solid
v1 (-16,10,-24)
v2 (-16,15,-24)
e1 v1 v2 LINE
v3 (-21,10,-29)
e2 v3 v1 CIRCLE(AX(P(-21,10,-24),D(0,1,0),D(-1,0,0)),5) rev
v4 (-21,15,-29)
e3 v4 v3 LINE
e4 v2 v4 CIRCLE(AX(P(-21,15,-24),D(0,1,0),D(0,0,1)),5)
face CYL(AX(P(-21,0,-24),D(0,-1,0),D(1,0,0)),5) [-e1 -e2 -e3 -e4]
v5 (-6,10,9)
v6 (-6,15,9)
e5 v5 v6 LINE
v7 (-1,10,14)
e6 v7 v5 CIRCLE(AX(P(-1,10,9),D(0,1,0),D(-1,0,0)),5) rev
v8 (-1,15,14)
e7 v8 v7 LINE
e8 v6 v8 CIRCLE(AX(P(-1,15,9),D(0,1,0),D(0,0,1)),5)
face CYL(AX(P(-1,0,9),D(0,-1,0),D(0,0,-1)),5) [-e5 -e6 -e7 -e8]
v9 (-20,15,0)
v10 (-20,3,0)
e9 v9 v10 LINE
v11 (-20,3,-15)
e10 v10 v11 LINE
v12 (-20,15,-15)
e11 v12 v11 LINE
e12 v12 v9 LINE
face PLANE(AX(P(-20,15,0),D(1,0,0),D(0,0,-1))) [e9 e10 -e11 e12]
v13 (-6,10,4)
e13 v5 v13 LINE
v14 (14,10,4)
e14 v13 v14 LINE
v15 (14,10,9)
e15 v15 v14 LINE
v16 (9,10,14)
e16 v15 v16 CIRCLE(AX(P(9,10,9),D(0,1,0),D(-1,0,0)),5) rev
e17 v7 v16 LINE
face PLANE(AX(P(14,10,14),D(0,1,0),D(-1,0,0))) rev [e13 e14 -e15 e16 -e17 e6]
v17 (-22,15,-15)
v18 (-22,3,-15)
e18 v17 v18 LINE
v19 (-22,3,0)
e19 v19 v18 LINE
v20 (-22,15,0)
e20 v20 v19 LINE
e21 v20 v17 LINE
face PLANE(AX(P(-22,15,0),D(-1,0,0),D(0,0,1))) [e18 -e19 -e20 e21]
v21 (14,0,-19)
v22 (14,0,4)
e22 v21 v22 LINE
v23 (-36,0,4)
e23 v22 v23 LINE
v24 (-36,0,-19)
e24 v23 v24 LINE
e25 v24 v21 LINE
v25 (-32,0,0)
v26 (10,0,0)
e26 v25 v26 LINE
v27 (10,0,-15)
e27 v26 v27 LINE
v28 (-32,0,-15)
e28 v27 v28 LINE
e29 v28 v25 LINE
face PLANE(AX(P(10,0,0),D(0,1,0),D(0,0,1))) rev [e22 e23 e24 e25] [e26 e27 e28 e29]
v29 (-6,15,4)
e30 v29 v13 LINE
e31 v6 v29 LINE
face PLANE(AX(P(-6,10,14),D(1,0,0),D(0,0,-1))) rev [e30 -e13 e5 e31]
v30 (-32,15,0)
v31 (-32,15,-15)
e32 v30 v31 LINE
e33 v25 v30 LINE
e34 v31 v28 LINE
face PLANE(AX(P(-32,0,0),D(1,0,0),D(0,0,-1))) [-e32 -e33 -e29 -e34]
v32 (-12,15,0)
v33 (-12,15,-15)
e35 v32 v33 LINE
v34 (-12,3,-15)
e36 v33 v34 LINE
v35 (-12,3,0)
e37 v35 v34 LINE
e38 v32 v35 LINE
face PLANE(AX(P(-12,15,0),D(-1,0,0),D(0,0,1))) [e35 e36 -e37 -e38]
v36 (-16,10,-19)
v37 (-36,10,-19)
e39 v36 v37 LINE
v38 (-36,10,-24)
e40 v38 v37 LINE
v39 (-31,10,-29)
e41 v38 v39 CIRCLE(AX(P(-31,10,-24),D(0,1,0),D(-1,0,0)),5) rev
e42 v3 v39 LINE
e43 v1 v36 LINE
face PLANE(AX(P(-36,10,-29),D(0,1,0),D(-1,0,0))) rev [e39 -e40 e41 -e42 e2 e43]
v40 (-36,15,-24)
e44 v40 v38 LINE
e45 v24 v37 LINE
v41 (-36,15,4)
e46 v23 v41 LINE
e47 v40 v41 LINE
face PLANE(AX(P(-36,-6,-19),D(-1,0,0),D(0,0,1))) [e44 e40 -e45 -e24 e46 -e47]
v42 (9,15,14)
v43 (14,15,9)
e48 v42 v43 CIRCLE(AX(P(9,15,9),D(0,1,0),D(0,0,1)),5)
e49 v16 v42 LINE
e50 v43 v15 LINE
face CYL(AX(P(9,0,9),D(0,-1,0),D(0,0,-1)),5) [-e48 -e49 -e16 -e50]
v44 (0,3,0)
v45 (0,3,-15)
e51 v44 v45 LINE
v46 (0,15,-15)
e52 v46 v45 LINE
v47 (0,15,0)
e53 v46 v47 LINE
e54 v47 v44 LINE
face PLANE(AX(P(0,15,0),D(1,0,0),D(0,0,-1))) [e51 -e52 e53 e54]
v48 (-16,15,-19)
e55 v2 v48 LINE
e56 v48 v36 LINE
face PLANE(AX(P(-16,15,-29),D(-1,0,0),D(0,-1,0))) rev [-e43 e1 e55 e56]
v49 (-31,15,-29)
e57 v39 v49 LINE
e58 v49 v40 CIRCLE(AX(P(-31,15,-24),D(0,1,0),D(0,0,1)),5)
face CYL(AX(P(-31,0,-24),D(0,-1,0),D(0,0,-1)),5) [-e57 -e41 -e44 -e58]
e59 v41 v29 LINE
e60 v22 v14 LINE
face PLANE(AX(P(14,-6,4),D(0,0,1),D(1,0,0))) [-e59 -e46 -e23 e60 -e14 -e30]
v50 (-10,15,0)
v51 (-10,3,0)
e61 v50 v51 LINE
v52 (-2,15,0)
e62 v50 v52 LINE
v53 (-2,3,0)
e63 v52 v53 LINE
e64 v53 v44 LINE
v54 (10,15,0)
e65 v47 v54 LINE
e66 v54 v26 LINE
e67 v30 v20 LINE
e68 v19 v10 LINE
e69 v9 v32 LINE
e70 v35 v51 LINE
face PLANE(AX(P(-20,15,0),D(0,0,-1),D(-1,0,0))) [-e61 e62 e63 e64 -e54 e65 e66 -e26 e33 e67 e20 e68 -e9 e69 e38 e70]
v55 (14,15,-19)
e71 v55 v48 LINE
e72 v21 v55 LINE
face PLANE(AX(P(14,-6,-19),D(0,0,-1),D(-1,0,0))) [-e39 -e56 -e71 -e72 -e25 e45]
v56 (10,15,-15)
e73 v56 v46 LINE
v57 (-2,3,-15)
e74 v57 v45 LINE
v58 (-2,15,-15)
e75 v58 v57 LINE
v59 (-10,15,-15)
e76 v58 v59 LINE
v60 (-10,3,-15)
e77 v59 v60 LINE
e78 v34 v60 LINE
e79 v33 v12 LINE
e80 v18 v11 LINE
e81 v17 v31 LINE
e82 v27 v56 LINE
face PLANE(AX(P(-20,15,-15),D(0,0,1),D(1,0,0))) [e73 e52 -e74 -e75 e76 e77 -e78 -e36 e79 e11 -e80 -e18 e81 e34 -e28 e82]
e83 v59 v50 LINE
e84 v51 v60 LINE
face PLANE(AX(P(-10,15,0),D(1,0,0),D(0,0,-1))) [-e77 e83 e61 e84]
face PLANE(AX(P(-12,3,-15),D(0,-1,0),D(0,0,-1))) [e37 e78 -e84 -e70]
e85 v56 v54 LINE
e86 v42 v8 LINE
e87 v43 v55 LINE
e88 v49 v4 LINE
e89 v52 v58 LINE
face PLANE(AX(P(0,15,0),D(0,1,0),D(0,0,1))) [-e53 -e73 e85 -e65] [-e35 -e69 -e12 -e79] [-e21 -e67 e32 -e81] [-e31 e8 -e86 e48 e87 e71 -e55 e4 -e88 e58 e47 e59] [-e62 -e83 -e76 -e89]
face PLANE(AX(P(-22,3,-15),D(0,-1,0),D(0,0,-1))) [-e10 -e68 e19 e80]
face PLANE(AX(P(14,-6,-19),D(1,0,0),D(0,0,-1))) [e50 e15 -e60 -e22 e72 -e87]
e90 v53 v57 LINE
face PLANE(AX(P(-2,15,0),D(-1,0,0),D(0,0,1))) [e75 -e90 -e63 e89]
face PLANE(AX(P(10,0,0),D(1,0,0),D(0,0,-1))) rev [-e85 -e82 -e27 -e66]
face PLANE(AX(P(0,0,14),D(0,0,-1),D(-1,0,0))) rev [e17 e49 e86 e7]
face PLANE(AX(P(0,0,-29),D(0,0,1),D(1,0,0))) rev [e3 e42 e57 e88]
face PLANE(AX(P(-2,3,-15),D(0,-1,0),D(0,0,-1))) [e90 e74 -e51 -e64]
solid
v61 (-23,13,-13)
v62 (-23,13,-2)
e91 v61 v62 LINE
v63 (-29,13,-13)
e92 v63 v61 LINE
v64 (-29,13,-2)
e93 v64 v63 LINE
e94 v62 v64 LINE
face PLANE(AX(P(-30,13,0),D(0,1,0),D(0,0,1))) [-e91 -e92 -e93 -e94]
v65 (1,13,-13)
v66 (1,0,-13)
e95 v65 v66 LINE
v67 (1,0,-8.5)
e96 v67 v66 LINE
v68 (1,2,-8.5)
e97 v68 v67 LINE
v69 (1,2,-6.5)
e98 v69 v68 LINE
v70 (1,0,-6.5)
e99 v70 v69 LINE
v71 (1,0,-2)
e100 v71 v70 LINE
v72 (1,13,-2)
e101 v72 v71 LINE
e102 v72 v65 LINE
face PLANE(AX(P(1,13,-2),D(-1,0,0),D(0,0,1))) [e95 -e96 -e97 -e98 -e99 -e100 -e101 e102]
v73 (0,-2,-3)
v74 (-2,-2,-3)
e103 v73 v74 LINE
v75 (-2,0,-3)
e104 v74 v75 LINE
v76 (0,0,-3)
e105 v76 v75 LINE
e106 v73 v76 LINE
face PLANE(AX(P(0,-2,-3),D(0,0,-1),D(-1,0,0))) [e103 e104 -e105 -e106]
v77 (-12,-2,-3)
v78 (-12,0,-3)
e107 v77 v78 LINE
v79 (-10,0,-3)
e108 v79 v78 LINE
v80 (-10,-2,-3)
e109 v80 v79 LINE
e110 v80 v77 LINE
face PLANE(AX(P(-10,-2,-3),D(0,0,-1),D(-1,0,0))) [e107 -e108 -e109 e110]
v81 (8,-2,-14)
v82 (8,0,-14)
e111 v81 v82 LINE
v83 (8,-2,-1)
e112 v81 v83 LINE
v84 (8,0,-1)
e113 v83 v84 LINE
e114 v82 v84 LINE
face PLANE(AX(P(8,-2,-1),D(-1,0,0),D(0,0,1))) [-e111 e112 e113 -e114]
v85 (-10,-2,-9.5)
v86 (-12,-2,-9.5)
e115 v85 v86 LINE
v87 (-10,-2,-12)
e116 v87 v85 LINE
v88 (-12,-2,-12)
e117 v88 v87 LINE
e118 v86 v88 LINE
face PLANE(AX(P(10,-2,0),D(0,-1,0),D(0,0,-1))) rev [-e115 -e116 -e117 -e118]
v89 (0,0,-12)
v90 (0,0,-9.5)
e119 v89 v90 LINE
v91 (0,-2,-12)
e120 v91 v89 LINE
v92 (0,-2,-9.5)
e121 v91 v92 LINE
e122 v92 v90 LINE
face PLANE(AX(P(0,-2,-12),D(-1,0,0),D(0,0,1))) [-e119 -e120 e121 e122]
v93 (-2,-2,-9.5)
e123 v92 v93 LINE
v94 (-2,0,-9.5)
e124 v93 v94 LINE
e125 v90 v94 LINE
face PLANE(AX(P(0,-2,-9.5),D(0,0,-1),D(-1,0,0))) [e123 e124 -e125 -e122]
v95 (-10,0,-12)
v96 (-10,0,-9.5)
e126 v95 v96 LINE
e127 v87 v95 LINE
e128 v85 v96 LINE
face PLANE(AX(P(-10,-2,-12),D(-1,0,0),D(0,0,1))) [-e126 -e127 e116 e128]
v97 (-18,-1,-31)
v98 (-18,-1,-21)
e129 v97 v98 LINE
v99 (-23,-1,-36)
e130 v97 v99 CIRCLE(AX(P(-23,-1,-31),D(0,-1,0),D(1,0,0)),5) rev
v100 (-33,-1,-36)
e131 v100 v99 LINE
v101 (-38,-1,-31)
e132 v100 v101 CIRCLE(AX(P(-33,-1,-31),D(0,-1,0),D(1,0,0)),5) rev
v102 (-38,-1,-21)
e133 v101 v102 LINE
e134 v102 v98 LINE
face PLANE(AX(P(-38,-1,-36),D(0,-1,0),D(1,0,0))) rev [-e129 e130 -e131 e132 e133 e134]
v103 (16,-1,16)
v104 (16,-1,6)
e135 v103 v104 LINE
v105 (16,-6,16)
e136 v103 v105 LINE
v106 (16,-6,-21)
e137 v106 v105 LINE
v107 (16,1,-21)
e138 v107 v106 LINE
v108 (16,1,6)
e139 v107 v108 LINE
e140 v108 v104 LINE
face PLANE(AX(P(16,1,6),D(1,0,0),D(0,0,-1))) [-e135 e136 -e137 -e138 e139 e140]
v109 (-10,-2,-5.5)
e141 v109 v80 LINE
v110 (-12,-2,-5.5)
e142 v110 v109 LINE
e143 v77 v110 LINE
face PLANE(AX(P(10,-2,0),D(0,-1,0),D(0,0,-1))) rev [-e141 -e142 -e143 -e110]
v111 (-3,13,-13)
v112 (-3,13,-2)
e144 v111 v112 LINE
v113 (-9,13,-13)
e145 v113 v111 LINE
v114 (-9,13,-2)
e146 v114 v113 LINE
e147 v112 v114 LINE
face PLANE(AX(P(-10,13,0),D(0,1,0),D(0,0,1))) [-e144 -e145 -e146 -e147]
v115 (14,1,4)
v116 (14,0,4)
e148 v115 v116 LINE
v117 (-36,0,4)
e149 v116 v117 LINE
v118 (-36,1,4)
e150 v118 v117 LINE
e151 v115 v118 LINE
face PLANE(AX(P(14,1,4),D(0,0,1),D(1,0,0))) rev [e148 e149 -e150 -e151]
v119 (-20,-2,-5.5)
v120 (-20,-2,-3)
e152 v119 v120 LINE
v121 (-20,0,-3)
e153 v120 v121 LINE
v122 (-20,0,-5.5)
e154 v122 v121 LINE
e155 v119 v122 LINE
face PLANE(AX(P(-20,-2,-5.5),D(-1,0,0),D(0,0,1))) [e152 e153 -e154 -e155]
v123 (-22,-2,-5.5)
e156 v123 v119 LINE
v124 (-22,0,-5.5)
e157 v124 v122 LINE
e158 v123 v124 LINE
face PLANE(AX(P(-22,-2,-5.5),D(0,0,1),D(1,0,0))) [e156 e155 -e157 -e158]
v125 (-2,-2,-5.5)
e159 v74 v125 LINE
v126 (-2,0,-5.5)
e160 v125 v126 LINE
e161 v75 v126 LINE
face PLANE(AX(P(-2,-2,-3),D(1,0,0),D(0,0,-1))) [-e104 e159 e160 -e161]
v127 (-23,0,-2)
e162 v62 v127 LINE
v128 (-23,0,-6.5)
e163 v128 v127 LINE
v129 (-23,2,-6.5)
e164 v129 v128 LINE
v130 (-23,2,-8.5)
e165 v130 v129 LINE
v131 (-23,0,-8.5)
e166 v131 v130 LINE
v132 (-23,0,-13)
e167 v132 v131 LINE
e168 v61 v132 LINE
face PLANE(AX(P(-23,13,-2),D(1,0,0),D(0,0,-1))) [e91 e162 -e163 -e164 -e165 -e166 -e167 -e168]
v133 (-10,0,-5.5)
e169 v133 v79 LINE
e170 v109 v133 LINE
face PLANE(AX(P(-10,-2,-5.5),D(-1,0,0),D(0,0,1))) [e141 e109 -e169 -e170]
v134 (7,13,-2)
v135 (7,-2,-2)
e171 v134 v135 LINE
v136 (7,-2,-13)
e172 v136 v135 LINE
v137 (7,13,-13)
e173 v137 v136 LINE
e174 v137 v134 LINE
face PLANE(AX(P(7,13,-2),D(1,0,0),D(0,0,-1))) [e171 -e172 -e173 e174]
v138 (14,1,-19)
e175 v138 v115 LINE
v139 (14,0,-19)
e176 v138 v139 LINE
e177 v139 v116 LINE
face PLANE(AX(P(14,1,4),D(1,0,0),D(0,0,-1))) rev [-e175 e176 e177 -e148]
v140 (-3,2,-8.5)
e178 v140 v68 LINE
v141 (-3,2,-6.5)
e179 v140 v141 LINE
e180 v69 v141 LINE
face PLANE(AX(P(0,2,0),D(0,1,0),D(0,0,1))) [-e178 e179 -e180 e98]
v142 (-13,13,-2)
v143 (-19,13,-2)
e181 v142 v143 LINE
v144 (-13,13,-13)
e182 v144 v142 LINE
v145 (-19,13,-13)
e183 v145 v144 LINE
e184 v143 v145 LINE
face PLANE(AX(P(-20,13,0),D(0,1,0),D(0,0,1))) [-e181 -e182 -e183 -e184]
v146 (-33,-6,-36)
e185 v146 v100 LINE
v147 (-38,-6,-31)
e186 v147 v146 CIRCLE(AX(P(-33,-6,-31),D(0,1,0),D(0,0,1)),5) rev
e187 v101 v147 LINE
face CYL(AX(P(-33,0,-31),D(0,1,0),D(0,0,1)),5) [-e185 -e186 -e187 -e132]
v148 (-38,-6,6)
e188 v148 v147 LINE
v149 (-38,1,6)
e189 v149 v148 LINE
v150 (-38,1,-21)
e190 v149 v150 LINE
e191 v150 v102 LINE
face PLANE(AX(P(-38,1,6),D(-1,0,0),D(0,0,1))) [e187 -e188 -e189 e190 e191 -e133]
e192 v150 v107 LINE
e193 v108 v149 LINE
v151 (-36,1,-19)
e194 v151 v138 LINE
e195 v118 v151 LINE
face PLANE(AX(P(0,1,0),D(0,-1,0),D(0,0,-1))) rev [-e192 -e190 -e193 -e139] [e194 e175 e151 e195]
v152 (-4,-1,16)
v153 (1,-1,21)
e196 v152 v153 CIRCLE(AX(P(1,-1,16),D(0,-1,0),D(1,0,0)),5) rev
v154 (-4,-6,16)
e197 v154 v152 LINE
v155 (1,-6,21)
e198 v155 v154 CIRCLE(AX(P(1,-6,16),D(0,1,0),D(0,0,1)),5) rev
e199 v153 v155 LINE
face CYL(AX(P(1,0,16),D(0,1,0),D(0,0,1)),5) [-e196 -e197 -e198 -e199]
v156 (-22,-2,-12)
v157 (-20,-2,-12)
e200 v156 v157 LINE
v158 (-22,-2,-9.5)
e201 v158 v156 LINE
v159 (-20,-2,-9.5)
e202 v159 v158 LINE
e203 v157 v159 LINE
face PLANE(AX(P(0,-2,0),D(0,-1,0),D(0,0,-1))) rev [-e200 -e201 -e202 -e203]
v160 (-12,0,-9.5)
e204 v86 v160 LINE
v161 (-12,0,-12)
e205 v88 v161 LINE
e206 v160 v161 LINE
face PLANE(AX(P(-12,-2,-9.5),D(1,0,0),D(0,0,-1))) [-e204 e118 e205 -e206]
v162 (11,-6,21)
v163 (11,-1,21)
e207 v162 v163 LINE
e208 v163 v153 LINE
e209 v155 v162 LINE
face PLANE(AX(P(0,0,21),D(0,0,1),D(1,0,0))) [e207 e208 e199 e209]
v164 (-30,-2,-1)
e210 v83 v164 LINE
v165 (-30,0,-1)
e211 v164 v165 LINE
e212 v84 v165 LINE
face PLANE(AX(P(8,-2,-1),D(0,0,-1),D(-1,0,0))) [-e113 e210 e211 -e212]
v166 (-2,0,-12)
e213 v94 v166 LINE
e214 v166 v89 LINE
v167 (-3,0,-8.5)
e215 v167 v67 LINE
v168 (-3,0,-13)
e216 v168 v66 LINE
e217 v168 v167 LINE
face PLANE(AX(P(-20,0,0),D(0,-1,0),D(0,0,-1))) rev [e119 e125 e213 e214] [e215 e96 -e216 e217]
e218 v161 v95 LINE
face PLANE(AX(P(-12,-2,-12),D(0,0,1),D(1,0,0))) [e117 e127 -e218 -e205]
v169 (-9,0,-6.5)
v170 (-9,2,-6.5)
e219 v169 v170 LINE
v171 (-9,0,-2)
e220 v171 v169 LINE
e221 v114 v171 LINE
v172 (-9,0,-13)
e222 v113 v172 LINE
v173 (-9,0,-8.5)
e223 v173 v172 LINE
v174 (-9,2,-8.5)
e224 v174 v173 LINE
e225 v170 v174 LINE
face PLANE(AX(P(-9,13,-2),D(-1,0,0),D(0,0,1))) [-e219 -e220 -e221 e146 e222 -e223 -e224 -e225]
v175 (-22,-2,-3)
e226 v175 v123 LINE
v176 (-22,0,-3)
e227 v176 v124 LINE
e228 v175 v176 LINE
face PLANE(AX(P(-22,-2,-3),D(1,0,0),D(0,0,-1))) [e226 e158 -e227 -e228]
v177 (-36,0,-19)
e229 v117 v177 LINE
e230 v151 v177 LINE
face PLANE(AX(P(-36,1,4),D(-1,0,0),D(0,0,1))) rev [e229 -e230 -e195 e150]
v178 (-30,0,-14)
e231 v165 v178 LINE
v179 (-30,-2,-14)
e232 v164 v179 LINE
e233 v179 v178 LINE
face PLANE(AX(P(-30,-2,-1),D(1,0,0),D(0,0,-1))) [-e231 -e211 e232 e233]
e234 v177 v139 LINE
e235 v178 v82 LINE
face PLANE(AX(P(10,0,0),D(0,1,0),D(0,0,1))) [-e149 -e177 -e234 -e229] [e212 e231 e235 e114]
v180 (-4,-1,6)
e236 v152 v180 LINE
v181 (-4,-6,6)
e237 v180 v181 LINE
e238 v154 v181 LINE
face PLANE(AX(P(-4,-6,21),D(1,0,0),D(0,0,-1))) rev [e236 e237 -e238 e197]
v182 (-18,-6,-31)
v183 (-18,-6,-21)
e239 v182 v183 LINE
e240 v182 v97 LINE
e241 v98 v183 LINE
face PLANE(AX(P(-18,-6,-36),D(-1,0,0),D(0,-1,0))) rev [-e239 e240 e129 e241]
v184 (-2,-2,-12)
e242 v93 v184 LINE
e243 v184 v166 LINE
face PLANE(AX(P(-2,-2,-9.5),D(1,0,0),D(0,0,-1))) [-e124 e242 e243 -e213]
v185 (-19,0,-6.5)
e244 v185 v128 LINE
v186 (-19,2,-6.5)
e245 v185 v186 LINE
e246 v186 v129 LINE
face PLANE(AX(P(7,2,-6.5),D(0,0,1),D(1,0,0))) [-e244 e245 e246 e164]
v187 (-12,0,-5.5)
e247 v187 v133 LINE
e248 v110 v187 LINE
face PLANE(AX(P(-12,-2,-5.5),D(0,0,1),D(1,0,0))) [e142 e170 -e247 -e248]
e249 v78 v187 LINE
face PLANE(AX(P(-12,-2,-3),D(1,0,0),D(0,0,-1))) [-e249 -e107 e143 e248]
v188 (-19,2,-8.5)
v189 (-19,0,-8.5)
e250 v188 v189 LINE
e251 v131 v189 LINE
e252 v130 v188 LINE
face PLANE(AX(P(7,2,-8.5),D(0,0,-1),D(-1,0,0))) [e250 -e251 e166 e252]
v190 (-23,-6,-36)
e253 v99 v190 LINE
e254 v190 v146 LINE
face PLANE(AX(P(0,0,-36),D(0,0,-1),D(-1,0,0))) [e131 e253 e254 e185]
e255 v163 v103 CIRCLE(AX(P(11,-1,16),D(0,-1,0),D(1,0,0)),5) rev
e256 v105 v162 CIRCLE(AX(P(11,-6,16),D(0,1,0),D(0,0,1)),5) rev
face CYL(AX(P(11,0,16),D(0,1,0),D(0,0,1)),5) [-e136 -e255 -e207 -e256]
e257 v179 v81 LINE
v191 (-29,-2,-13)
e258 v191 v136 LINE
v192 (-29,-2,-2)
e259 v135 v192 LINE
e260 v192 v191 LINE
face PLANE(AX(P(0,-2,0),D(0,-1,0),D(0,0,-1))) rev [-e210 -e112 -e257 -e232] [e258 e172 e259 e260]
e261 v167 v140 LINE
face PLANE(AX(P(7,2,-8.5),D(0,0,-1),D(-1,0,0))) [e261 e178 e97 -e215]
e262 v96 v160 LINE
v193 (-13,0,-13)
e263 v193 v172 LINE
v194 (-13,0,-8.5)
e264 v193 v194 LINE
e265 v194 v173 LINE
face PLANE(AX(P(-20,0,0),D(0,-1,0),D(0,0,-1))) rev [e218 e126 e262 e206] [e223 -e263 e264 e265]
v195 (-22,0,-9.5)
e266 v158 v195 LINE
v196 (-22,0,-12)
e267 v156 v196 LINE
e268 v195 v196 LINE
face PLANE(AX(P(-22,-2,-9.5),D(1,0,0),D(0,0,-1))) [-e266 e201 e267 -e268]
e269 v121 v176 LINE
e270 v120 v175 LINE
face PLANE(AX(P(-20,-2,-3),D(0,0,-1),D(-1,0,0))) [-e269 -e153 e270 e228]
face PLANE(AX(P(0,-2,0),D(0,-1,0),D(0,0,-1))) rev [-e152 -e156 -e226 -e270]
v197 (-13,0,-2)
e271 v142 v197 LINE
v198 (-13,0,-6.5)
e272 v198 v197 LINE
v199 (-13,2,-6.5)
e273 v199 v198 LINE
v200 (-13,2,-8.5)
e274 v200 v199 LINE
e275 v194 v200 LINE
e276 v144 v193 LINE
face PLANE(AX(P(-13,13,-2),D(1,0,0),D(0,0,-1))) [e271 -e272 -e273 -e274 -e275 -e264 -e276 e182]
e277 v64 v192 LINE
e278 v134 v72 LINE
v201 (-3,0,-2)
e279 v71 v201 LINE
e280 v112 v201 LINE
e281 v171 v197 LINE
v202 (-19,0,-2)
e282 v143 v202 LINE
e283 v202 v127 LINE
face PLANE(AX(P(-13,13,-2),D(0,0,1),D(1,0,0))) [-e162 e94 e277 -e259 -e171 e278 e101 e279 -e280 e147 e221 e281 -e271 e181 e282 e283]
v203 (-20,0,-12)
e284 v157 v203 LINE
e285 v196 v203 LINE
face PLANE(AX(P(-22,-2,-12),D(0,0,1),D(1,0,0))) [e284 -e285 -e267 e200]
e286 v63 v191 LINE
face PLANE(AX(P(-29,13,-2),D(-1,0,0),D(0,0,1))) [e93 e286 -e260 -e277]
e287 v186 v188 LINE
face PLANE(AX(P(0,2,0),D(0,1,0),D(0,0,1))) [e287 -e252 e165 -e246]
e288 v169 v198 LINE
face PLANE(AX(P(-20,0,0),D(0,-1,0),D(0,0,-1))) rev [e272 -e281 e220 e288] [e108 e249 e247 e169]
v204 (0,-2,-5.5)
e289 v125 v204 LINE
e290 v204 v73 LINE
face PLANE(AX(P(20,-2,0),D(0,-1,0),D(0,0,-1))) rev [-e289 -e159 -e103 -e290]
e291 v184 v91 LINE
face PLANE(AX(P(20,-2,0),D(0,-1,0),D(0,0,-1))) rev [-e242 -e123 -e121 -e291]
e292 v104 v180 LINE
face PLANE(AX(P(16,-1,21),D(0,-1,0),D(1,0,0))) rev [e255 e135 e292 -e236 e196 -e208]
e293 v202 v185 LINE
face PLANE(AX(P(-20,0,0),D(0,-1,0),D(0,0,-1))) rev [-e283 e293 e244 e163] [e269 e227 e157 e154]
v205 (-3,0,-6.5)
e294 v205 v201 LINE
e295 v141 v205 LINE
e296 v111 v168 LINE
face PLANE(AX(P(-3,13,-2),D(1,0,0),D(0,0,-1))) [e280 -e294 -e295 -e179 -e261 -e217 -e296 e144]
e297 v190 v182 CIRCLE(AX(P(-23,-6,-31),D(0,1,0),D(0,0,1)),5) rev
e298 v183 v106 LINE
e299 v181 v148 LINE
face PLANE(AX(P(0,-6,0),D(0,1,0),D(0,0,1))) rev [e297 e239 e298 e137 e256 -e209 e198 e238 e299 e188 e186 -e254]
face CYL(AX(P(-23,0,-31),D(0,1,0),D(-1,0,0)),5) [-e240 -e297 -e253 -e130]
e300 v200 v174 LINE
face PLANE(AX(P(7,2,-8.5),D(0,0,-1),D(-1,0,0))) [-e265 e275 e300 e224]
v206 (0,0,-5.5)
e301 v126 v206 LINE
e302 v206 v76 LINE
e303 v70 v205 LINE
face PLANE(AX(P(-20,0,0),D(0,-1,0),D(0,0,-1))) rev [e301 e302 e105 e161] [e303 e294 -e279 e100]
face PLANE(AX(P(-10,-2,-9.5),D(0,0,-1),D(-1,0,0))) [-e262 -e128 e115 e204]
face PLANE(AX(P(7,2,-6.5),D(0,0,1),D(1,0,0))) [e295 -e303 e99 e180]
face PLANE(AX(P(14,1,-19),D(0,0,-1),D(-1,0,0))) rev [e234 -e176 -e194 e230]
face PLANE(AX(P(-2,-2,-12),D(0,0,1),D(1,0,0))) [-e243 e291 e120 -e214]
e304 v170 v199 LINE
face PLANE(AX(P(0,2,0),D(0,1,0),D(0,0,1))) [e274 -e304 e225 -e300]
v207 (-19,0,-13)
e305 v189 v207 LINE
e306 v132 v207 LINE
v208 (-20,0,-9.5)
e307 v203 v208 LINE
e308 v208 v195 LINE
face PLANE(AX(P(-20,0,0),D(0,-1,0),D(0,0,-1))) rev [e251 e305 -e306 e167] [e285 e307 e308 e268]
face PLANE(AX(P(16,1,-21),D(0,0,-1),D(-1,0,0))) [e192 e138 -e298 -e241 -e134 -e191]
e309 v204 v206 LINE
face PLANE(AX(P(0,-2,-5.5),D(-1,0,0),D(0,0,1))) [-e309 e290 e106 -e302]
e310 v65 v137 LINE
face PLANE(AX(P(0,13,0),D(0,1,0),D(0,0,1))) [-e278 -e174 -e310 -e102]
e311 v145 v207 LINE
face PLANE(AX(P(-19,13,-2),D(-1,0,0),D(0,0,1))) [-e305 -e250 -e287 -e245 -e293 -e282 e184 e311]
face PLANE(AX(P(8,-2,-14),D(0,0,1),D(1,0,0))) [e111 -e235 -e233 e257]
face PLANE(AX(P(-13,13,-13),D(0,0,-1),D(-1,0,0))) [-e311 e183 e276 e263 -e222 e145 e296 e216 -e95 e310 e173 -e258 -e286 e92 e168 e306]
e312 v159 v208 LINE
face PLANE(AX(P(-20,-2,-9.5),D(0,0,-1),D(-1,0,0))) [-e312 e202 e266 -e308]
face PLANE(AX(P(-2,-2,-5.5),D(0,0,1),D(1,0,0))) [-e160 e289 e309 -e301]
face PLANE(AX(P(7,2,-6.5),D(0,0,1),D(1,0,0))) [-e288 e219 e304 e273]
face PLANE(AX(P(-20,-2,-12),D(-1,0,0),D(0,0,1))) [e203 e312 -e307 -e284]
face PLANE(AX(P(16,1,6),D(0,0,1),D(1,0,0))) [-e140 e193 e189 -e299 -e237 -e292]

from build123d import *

# Parameters (mm, degrees)
SKETCH1_W                = 8
SKETCH1_H                = 15
BOSS_EXTRUDE1_DEPTH      = 15
SKETCH2_W                = 6
SKETCH2_H                = 11
CUT_EXTRUDE1_DEPTH       = 13
SKETCH3_W                = 15
SKETCH3_H                = 3
BOSS_EXTRUDE2_DEPTH      = 2
LPATTERN1_COUNT          = 4
LPATTERN1_PITCH          = 10
SKETCH4_W                = 15
SKETCH4_H                = 12
BOSS_EXTRUDE3_DEPTH      = 2
SKETCH5_W                = 15
SKETCH5_H                = 15
BOSS_EXTRUDE4_DEPTH      = 2
SKETCH6_W                = 36
SKETCH6_H                = 2
CUT_EXTRUDE2_DEPTH       = 2
SKETCH7_W                = 38
SKETCH7_H                = 13
SKETCH7_W_2              = 36
SKETCH7_H_2              = 11
BOSS_EXTRUDE5_DEPTH      = 2
SKETCH8_W                = 2
SKETCH8_H                = 2.5
BOSS_EXTRUDE6_DEPTH      = 2
LPATTERN2_COUNT          = 3
LPATTERN2_PITCH          = 10
BOSS_EXTRUDE7_DEPTH      = 15
BOSS_EXTRUDE7_DEPTH_BACK = 6
SKETCH9_W                = 50
SKETCH9_H                = 23
SPLIT1_START             = -6
SPLIT1_OUTLINE_W         = 50
SPLIT1_OUTLINE_H         = 23
SPLIT1_DEPTH             = 6
SPLIT1_2_OUTLINE_W       = 6
SPLIT1_2_OUTLINE_H       = 11
SPLIT1_2_DEPTH           = 13
SPLIT1_3_OUTLINE_W       = 4
SPLIT1_3_OUTLINE_H       = 2
SPLIT1_3_DEPTH           = 2
SPLIT1_START_2           = -13
SPLIT1_4_DEPTH           = 11
SPLIT1_START_3           = -19
SPLIT1_5_DEPTH           = 23
SPLIT1_6_OUTLINE_W       = 38
SPLIT1_6_OUTLINE_H       = 2
SPLIT1_6_DEPTH           = 5
SPLIT1_START_4           = -1
SPLIT1_7_OUTLINE_W       = 38
SPLIT1_7_OUTLINE_H       = 2
SPLIT1_7_DEPTH           = 5
SPLIT1_START_5           = -8.5
SPLIT1_8_DEPTH           = 2
SPLIT1_START_6           = -9.5
SPLIT1_9_OUTLINE_W       = 2
SPLIT1_9_OUTLINE_H       = 2
SPLIT1_9_DEPTH           = 4
SPLIT1_10_OUTLINE_W      = 2
SPLIT1_10_OUTLINE_H      = 2
SPLIT1_10_DEPTH          = 1
SPLIT1_START_7           = -3
SPLIT1_11_OUTLINE_W      = 2
SPLIT1_11_OUTLINE_H      = 2
SPLIT1_11_DEPTH          = 1
SKETCH11_W               = 20
SKETCH11_H               = 5
BOSS_EXTRUDE8_DEPTH      = 10
SKETCH12_W               = 20
SKETCH12_H               = 5
BOSS_EXTRUDE9_DEPTH      = 10
FILLET1_R                = 5
SKETCH13_W               = 54
SKETCH13_H               = 27
SKETCH13_W_2             = 50
SKETCH13_H_2             = 23
BOSS_EXTRUDE11_DEPTH     = 7
SKETCH14_W               = 20
SKETCH14_H               = 5
BOSS_EXTRUDE12_DEPTH     = 15
SKETCH15_W               = 20
SKETCH15_H               = 5
BOSS_EXTRUDE13_DEPTH     = 15
FILLET2_R                = 5


# Read off the part's stored shape, not the designer's step: Split1
with BuildPart() as part:
    # Sketch1 → Boss-Extrude1 (new body)
    with BuildSketch(Plane(origin=(0, 0, 0), x_dir=(1, 0, 0), z_dir=(0, 1, 0))):
        with Locations((4, 7.5)):
            Rectangle(SKETCH1_W, SKETCH1_H)
    extrude(amount=BOSS_EXTRUDE1_DEPTH)

    # Sketch2 → Cut-Extrude1 (cut)
    with BuildSketch(Plane.XZ):
        with Locations((4, -7.5)):
            Rectangle(SKETCH2_W, SKETCH2_H)
    extrude(amount=-CUT_EXTRUDE1_DEPTH, mode=Mode.SUBTRACT)

    # Sketch3 → Boss-Extrude2 (add)
    with BuildSketch(Plane.ZY):
        with Locations((-7.5, 1.5)):
            Rectangle(SKETCH3_W, SKETCH3_H)
    extrude(amount=BOSS_EXTRUDE2_DEPTH)


with BuildPart() as lpattern1_1:
    # LPattern1: pattern copy
    add(part.part.moved(Location(Vector(-1, 0, 0) * (1 * LPATTERN1_PITCH))))


with BuildPart() as lpattern1_2:
    # LPattern1: pattern copy
    add(part.part.moved(Location(Vector(-1, 0, 0) * (2 * LPATTERN1_PITCH))))


with BuildPart() as lpattern1_3:
    # LPattern1: pattern copy
    add(part.part.moved(Location(Vector(-1, 0, 0) * (3 * LPATTERN1_PITCH))))


with BuildPart() as lpattern1_2_1:
    add(lpattern1_2.part)

    # Combine1: union LPattern1_1, part, LPattern1_3
    add(lpattern1_1.part)
    add(part.part)
    add(lpattern1_3.part)

    # Sketch4 → Boss-Extrude3 (add)
    with BuildSketch(Plane.ZY.offset(30)):
        with Locations((-7.5, 9)):
            Rectangle(SKETCH4_W, SKETCH4_H)
    extrude(amount=BOSS_EXTRUDE3_DEPTH)

    # Sketch5 → Boss-Extrude4 (add)
    with BuildSketch(Plane(origin=(8, 0, 0), x_dir=(0, 0, -1), z_dir=(1, 0, 0))):
        with Locations((7.5, 7.5)):
            Rectangle(SKETCH5_W, SKETCH5_H)
    extrude(amount=BOSS_EXTRUDE4_DEPTH)

    # Sketch6 → Cut-Extrude2 (cut)
    with BuildSketch(Plane(origin=(0, 0, 0), x_dir=(-1, 0, 0), z_dir=(0, -1, 0))):
        with Locations((11, 7.5)):
            Rectangle(SKETCH6_W, SKETCH6_H)
    extrude(amount=-CUT_EXTRUDE2_DEPTH, mode=Mode.SUBTRACT)

    # Sketch7 → Boss-Extrude5 (add)
    with BuildSketch(Plane.XZ):
        with Locations((-11, -7.5)):
            Rectangle(SKETCH7_W, SKETCH7_H)
        with Locations((-11, -7.5)):
            Rectangle(SKETCH7_W_2, SKETCH7_H_2, mode=Mode.SUBTRACT)
    extrude(amount=BOSS_EXTRUDE5_DEPTH)

    # Sketch8 → Boss-Extrude6 (add)
    with BuildSketch(Plane.XZ):
        with Locations((-21, -10.75)):
            Rectangle(SKETCH8_W, SKETCH8_H)
        with Locations((-21, -4.25)):
            Rectangle(SKETCH8_W, SKETCH8_H)
    boss_extrude6 = extrude(amount=BOSS_EXTRUDE6_DEPTH)

    # LPattern2: Boss-Extrude6 ×3
    with Locations(*[(i * LPATTERN2_PITCH, 0, 0) for i in range(1, LPATTERN2_COUNT)]):
        add(boss_extrude6)


with BuildPart() as body_2:
    # Sketch9 → Boss-Extrude7 (new, two sides: drawn at the far end of the back side and taken through both)
    with BuildSketch(Plane(origin=(0, 0, 0), x_dir=(1, 0, 0), z_dir=(0, 1, 0)).offset(-BOSS_EXTRUDE7_DEPTH_BACK)):
        with Locations((-11, 7.5)):
            Rectangle(SKETCH9_W, SKETCH9_H)
    extrude(amount=BOSS_EXTRUDE7_DEPTH + BOSS_EXTRUDE7_DEPTH_BACK)

    # Combine2: cut LPattern1_2
    add(lpattern1_2_1.part, mode=Mode.SUBTRACT)

    # Split1 outline → Split1 (cut)
    with BuildSketch(Plane(origin=(0, 0, 0), x_dir=(1, 0, 0), z_dir=(0, 1, 0)).offset(SPLIT1_START)):
        with Locations((-11, 7.5)):
            Rectangle(SPLIT1_OUTLINE_W, SPLIT1_OUTLINE_H)
    extrude(amount=SPLIT1_DEPTH, mode=Mode.SUBTRACT)

    # Split1 2 outline → Split1 2 (cut)
    with BuildSketch(Plane(origin=(0, 0, 0), x_dir=(1, 0, 0), z_dir=(0, 1, 0))):
        with Locations((-26, 7.5)):
            Rectangle(SPLIT1_2_OUTLINE_W, SPLIT1_2_OUTLINE_H)
        with Locations((-16, 7.5)):
            Rectangle(SPLIT1_2_OUTLINE_W, SPLIT1_2_OUTLINE_H)
        with Locations((-6, 7.5)):
            Rectangle(SPLIT1_2_OUTLINE_W, SPLIT1_2_OUTLINE_H)
        with Locations((4, 7.5)):
            Rectangle(SPLIT1_2_OUTLINE_W, SPLIT1_2_OUTLINE_H)
    extrude(amount=SPLIT1_2_DEPTH, mode=Mode.SUBTRACT)

    # Split1 3 outline → Split1 3 (cut)
    with BuildSketch(Plane(origin=(0, 0, 0), x_dir=(1, 0, 0), z_dir=(0, 1, 0))):
        with Locations((-21, 7.5)):
            Rectangle(SPLIT1_3_OUTLINE_W, SPLIT1_3_OUTLINE_H)
        with Locations((-11, 7.5)):
            Rectangle(SPLIT1_3_OUTLINE_W, SPLIT1_3_OUTLINE_H)
        with Locations((-1, 7.5)):
            Rectangle(SPLIT1_3_OUTLINE_W, SPLIT1_3_OUTLINE_H)
    extrude(amount=SPLIT1_3_DEPTH, mode=Mode.SUBTRACT)

    # Sketch11 → Boss-Extrude8 (add)
    with BuildSketch(Plane.XY.offset(4)):
        with Locations((4, 12.5)):
            Rectangle(SKETCH11_W, SKETCH11_H)
    extrude(amount=BOSS_EXTRUDE8_DEPTH)

    # Sketch12 → Boss-Extrude9 (add)
    with BuildSketch(Plane(origin=(0, 0, -19), x_dir=(-1, 0, 0), z_dir=(0, 0, -1))):
        with Locations((26, 12.5)):
            Rectangle(SKETCH12_W, SKETCH12_H)
    extrude(amount=BOSS_EXTRUDE9_DEPTH)

    # Fillet1
    fillet1_edges = [body_2.edges().sort_by_distance(p)[0] for p in [
        (-6, 12.5, 14),
        (14, 12.5, 14),
        (-36, 12.5, -29),
        (-16, 12.5, -29),
    ]]
    fillet(fillet1_edges, radius=FILLET1_R)


with BuildPart() as body_2_2:
    # Split1 4 outline → Split1 4 (new body)
    with BuildSketch(Plane.XY.offset(SPLIT1_START_2)):
        Polygon((1, 13), (1, 0), (0, 0), (0, -2), (-2, -2), (-2, 0), (-3, 0), (-3, 13), (-9, 13), (-9, 0), (-10, 0), (-10, -2), (-12, -2), (-12, 0), (-13, 0), (-13, 13), (-19, 13), (-19, 0), (-20, 0), (-20, -2), (-22, -2), (-22, 0), (-23, 0), (-23, 13), (-29, 13), (-29, -2), (-30, -2), (-30, 0), (-36, 0), (-36, -6), (14, -6), (14, 0), (8, 0), (8, -2), (7, -2), (7, 13), align=None)
    extrude(amount=SPLIT1_4_DEPTH)

    # Split1 5 outline → Split1 5 (add)
    with BuildSketch(Plane.XY.offset(SPLIT1_START_3)):
        Polygon((8, -2), (-30, -2), (-30, 0), (-36, 0), (-36, -6), (14, -6), (14, 0), (8, 0), align=None)
    extrude(amount=SPLIT1_5_DEPTH)

    # Split1 6 outline → Split1 6 (add)
    with BuildSketch(Plane.XY.offset(SPLIT1_START_3)):
        with Locations((-11, -1)):
            Rectangle(SPLIT1_6_OUTLINE_W, SPLIT1_6_OUTLINE_H)
    extrude(amount=SPLIT1_6_DEPTH)

    # Split1 7 outline → Split1 7 (add)
    with BuildSketch(Plane.XY.offset(SPLIT1_START_4)):
        with Locations((-11, -1)):
            Rectangle(SPLIT1_7_OUTLINE_W, SPLIT1_7_OUTLINE_H)
    extrude(amount=SPLIT1_7_DEPTH)

    # Split1 8 outline → Split1 8 (add)
    with BuildSketch(Plane.XY.offset(SPLIT1_START_5)):
        Polygon((1, 0), (1, 2), (-3, 2), (-3, 0), (-2, 0), (-2, -2), (0, -2), (0, 0), align=None)
        Polygon((-10, 0), (-9, 0), (-9, 2), (-13, 2), (-13, 0), (-12, 0), (-12, -2), (-10, -2), align=None)
        Polygon((-22, -2), (-20, -2), (-20, 0), (-19, 0), (-19, 2), (-23, 2), (-23, 0), (-22, 0), align=None)
    extrude(amount=SPLIT1_8_DEPTH)

    # Split1 9 outline → Split1 9 (add)
    with BuildSketch(Plane.XY.offset(SPLIT1_START_6)):
        with Locations((-1, -1)):
            Rectangle(SPLIT1_9_OUTLINE_W, SPLIT1_9_OUTLINE_H)
        with Locations((-11, -1)):
            Rectangle(SPLIT1_9_OUTLINE_W, SPLIT1_9_OUTLINE_H)
        with Locations((-21, -1)):
            Rectangle(SPLIT1_9_OUTLINE_W, SPLIT1_9_OUTLINE_H)
    extrude(amount=SPLIT1_9_DEPTH)

    # Split1 10 outline → Split1 10 (add)
    with BuildSketch(Plane.XY.offset(SPLIT1_START_2)):
        with Locations((-1, -1)):
            Rectangle(SPLIT1_10_OUTLINE_W, SPLIT1_10_OUTLINE_H)
        with Locations((-11, -1)):
            Rectangle(SPLIT1_10_OUTLINE_W, SPLIT1_10_OUTLINE_H)
        with Locations((-21, -1)):
            Rectangle(SPLIT1_10_OUTLINE_W, SPLIT1_10_OUTLINE_H)
    extrude(amount=SPLIT1_10_DEPTH)

    # Split1 11 outline → Split1 11 (add)
    with BuildSketch(Plane.XY.offset(SPLIT1_START_7)):
        with Locations((-1, -1)):
            Rectangle(SPLIT1_11_OUTLINE_W, SPLIT1_11_OUTLINE_H)
        with Locations((-11, -1)):
            Rectangle(SPLIT1_11_OUTLINE_W, SPLIT1_11_OUTLINE_H)
        with Locations((-21, -1)):
            Rectangle(SPLIT1_11_OUTLINE_W, SPLIT1_11_OUTLINE_H)
    extrude(amount=SPLIT1_11_DEPTH)

    # Sketch13 → Boss-Extrude11 (add)
    with BuildSketch(Plane.XZ.offset(6)):
        with Locations((-11, -7.5)):
            Rectangle(SKETCH13_W, SKETCH13_H)
        with Locations((-11, -7.5)):
            Rectangle(SKETCH13_W_2, SKETCH13_H_2, mode=Mode.SUBTRACT)
    extrude(amount=-BOSS_EXTRUDE11_DEPTH)

    # Sketch14 → Boss-Extrude12 (add)
    with BuildSketch(Plane.XY.offset(6)):
        with Locations((6, -3.5)):
            Rectangle(SKETCH14_W, SKETCH14_H)
    extrude(amount=BOSS_EXTRUDE12_DEPTH)

    # Sketch15 → Boss-Extrude13 (add)
    with BuildSketch(Plane(origin=(0, 0, -21), x_dir=(-1, 0, 0), z_dir=(0, 0, -1))):
        with Locations((28, -3.5)):
            Rectangle(SKETCH15_W, SKETCH15_H)
    extrude(amount=BOSS_EXTRUDE13_DEPTH)

    # Fillet2
    fillet2_edges = [body_2_2.edges().sort_by_distance(p)[0] for p in [
        (16, -3.5, 21),
        (-4, -3.5, 21),
        (-38, -3.5, -36),
        (-18, -3.5, -36),
    ]]
    fillet(fillet2_edges, radius=FILLET2_R)


solid = Compound([body_2.part, body_2_2.part])
